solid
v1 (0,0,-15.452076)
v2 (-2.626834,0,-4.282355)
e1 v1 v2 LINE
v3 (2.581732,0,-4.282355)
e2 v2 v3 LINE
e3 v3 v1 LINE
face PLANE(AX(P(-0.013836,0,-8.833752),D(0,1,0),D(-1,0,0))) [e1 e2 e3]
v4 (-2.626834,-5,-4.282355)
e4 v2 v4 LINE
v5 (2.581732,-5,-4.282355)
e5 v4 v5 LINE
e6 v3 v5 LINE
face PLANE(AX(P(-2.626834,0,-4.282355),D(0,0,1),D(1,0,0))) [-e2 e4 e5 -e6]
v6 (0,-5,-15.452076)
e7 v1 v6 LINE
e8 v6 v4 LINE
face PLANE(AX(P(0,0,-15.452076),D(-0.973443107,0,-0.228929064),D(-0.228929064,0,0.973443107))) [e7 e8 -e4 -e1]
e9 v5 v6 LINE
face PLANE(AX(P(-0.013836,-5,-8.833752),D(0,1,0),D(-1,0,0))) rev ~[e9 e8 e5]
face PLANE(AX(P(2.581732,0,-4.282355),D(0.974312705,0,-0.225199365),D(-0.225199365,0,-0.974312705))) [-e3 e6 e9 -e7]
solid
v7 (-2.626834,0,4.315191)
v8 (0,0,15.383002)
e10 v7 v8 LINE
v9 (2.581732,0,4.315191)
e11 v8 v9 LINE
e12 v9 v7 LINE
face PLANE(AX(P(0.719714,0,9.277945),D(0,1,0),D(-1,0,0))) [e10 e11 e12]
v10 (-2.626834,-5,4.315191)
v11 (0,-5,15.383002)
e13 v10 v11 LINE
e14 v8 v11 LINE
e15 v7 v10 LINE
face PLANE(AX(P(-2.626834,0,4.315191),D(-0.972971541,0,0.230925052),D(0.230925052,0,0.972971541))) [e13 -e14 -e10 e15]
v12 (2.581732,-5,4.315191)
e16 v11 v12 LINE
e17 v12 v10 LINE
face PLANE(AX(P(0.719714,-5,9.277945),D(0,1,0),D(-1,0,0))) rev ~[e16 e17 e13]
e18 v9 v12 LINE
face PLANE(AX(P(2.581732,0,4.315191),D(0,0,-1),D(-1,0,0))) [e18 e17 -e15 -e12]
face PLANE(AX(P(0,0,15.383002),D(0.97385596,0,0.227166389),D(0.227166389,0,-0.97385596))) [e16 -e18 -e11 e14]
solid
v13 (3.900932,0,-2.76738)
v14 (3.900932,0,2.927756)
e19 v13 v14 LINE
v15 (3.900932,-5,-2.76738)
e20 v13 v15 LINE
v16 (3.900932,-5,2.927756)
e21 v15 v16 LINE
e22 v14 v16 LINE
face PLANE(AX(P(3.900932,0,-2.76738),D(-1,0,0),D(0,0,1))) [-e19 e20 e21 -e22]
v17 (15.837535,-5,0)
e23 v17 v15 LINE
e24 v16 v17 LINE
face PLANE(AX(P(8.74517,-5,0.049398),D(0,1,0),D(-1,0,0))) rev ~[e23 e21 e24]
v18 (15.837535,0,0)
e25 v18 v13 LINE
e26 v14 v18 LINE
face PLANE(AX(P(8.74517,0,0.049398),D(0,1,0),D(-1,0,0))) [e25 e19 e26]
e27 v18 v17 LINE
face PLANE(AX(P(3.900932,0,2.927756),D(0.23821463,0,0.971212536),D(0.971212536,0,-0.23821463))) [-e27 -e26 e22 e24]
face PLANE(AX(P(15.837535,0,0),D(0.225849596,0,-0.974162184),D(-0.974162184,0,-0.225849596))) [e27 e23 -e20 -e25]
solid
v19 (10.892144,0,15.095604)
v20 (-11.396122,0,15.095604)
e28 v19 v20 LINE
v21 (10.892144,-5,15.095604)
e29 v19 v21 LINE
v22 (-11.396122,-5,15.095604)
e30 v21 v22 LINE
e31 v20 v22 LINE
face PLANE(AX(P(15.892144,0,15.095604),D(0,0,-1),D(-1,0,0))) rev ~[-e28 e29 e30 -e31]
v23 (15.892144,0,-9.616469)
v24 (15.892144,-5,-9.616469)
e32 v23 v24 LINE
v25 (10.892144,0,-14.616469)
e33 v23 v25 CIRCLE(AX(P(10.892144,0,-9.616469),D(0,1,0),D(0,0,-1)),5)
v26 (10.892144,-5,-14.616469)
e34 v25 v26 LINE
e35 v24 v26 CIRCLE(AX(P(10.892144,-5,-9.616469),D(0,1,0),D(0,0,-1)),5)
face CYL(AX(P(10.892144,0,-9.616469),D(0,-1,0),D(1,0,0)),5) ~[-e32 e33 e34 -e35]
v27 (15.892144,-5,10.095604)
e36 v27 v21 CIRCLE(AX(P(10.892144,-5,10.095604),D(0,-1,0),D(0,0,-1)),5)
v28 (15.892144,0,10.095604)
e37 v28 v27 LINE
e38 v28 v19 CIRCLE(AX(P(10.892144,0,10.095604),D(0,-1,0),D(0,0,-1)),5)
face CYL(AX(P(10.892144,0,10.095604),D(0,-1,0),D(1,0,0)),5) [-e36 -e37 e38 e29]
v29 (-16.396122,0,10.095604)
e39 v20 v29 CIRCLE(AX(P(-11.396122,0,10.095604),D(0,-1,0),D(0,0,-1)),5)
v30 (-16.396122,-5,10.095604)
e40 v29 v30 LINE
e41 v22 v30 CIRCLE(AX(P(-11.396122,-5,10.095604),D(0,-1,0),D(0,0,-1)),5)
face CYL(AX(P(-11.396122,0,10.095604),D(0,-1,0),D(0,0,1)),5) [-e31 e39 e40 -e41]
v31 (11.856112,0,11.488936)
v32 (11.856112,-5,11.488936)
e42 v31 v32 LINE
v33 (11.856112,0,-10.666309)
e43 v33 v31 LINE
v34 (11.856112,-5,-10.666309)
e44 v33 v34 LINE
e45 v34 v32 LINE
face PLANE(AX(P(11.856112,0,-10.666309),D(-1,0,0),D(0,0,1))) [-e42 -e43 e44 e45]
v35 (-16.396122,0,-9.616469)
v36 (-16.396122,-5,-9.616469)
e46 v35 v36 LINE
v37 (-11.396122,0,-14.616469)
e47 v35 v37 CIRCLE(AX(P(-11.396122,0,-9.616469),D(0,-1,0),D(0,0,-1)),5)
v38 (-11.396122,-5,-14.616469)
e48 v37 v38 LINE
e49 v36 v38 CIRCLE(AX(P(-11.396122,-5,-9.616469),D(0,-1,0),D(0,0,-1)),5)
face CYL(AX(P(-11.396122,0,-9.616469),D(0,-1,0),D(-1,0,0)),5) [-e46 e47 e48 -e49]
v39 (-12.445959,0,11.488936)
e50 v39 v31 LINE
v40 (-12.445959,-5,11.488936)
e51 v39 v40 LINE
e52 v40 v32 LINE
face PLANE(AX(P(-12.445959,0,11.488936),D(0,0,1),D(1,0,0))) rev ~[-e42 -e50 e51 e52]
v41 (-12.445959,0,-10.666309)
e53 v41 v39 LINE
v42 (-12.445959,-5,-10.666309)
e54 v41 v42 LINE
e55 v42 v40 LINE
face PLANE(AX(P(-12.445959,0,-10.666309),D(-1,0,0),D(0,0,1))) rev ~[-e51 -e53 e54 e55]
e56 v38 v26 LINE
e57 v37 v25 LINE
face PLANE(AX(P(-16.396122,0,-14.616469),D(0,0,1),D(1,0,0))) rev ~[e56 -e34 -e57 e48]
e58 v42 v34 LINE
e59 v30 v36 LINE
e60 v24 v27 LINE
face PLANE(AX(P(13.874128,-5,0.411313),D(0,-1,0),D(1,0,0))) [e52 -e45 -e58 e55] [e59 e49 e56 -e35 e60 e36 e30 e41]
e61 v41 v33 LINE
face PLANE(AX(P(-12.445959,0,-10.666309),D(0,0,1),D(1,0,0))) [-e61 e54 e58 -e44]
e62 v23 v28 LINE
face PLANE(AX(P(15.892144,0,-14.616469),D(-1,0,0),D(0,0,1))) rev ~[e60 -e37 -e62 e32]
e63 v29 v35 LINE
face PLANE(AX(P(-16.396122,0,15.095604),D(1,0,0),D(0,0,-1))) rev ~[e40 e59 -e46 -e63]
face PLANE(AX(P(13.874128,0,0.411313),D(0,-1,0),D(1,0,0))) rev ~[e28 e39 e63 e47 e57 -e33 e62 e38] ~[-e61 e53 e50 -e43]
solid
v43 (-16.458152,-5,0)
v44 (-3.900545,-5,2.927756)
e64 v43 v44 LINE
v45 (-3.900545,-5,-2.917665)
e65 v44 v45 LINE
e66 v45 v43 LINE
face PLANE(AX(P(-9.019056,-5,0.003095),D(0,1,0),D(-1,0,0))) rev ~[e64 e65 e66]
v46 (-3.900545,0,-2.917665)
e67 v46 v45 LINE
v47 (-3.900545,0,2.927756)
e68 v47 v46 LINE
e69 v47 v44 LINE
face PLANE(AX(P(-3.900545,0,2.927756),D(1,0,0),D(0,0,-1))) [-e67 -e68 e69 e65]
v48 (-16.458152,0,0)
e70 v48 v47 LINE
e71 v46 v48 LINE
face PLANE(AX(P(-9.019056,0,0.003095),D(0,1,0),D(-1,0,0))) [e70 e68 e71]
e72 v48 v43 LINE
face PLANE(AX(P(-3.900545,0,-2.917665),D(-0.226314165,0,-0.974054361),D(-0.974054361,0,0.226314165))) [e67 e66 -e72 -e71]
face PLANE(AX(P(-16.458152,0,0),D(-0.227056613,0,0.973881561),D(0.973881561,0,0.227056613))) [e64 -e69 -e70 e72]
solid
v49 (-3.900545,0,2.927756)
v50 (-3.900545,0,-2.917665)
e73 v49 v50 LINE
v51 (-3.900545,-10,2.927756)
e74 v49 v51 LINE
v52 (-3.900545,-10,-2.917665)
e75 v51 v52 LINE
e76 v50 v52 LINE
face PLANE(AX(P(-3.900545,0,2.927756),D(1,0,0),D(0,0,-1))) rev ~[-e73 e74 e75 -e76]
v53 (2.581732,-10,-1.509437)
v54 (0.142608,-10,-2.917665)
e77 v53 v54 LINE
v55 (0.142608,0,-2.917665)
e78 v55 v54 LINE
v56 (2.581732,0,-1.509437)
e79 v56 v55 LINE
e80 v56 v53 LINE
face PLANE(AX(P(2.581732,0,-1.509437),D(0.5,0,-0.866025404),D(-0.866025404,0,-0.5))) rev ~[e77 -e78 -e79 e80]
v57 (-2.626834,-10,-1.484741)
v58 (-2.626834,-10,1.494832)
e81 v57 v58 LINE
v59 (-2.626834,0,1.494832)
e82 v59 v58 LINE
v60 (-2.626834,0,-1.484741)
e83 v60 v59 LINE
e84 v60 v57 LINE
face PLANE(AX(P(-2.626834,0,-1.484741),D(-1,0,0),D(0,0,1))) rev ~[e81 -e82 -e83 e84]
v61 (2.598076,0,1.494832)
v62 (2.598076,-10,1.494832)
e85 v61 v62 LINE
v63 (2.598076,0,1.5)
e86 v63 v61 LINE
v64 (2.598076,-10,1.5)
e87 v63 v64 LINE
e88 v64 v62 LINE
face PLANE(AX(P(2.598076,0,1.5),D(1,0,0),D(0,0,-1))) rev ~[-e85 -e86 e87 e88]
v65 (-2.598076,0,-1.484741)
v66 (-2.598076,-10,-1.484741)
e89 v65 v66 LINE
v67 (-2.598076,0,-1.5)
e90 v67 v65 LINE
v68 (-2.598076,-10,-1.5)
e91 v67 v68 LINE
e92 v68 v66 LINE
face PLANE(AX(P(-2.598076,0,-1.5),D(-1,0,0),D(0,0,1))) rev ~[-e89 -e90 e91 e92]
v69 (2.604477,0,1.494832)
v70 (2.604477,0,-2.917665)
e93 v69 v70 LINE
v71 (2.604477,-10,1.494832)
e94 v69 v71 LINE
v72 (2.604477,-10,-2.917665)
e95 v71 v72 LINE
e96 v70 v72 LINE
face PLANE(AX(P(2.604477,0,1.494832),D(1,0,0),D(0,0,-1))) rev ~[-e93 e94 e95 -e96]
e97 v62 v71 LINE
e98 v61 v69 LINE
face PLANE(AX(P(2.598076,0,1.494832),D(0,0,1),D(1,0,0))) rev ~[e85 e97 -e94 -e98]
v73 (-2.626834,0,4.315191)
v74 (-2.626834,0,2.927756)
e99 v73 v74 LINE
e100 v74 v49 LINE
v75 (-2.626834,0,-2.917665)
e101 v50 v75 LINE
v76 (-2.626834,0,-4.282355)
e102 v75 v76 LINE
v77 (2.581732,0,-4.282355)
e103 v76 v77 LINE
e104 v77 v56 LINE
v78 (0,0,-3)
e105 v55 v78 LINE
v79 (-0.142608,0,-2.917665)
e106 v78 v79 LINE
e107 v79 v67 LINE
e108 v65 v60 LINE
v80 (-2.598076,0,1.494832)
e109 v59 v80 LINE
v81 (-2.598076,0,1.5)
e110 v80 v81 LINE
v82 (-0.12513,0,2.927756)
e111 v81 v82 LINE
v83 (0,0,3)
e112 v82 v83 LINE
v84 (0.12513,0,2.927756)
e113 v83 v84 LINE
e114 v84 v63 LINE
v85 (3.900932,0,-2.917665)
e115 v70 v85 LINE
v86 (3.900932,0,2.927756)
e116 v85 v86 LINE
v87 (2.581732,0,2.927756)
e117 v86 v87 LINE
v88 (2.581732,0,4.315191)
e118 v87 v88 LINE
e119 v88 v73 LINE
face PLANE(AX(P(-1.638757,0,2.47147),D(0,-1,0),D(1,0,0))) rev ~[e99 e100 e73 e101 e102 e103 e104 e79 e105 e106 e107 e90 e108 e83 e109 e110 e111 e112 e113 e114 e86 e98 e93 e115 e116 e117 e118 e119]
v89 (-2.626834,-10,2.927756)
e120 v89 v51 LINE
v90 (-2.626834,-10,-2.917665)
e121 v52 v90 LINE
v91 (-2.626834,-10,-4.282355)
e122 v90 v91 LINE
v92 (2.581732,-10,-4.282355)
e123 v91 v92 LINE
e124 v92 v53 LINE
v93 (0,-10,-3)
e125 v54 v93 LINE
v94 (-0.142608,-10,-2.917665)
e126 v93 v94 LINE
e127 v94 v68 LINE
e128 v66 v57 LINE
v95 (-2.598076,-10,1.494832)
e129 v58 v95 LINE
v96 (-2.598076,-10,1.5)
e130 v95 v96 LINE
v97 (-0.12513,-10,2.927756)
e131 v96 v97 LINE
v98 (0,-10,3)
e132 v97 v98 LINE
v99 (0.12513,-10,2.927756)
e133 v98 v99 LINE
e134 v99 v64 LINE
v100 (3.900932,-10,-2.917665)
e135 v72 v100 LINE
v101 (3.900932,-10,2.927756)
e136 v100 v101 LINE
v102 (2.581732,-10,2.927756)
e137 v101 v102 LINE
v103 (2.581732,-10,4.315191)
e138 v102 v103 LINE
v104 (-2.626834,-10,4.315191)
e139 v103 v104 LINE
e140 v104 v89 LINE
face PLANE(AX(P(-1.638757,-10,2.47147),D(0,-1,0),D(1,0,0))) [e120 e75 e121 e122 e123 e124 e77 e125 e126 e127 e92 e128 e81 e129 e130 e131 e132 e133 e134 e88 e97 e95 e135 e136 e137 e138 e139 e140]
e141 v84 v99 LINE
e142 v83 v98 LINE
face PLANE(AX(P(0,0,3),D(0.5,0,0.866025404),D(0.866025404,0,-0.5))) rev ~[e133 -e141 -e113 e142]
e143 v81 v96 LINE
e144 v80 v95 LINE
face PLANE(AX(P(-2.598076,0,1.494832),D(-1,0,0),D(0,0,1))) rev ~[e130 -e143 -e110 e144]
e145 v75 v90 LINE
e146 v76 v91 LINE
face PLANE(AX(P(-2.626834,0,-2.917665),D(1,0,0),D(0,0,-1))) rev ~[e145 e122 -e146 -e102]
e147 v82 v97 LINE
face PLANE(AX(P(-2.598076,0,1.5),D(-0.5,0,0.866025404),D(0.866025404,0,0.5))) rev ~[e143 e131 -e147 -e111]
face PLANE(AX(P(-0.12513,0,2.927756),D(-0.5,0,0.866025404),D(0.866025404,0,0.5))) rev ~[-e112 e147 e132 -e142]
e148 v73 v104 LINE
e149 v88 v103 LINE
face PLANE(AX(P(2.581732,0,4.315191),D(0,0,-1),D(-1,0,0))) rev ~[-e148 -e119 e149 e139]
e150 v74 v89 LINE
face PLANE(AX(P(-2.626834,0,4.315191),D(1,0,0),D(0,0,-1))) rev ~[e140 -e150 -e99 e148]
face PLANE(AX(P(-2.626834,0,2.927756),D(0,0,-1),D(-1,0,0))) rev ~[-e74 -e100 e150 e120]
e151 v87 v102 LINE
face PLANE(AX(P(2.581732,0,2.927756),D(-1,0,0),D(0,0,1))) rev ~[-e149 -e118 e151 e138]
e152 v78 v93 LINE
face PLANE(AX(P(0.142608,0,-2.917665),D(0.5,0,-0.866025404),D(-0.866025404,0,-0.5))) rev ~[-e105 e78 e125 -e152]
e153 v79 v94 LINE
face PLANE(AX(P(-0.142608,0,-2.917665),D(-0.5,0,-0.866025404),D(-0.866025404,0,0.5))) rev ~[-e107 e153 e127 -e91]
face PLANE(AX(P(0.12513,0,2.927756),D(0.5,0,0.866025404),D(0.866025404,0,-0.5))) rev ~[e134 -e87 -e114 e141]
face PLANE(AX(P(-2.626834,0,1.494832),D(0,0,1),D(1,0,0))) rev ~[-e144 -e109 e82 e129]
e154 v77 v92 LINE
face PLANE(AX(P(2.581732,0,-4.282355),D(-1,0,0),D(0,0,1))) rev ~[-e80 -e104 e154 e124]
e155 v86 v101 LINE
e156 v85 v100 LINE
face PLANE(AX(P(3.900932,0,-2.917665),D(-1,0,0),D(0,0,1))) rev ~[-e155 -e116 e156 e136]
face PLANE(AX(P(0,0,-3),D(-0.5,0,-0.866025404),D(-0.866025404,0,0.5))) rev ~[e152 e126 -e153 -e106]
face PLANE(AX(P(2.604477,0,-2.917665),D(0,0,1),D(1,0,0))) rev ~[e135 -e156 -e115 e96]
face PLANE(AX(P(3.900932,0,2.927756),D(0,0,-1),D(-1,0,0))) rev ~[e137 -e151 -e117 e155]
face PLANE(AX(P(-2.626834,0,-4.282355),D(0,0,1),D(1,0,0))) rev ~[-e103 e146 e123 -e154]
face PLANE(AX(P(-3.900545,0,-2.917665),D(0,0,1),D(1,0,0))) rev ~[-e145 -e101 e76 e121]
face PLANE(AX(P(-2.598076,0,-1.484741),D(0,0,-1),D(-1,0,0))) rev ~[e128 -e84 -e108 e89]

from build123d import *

# Parameters (mm, degrees)
F2_DEPTH = 10
F4_DEPTH = 5
F5_W     = 4.0360325947
F5_H     = 22.1552448347
F5_W_2   = 24.3020709604
F5_H_2   = 3.6066677421
F5_W_3   = 3.9501627907
F5_H_3   = 3.9501599967
F6_DEPTH = 5
F7_R     = 5


with BuildPart() as f2:
    # F1 (on face) → F2 (new body)
    with BuildSketch(Plane.XZ):
        Polygon((-2.6268342044, 2.9277561698), (-2.6268342044, 1.4948317548), (-2.5980762114, 1.4948317548), (-2.5980762114, 1.5), (-0.1251299844, 2.9277561698), align=None)
        Polygon((-2.6268342044, -1.4847409911), (-2.6268342044, 1.4948317548), (-2.6268342044, 2.9277561698), (-3.9005447179, 2.9277561698), (-3.9005447179, -2.9176650569), (-2.6268342044, -2.9176650569), align=None)
        Polygon((-2.6268342044, 4.3151909485), (-2.6268342044, 2.9277561698), (-0.1251299844, 2.9277561698), (0, 3), (0.1251299844, 2.9277561698), (2.5817316491, 2.9277561698), (2.5817316491, 4.3151909485), align=None)
        Polygon((-2.5980762114, -1.4847409911), (-2.6268342044, -1.4847409911), (-2.6268342044, -2.9176650569), (-0.1426083047, -2.9176650569), (-2.5980762114, -1.5), align=None)
        Polygon((2.5980762114, 1.5), (2.5980762114, 1.4948317548), (2.6044766419, 1.4948317548), (2.6044766419, 2.9277561698), (2.5817316491, 2.9277561698), (0.1251299844, 2.9277561698), align=None)
        Polygon((-0.1426083047, -2.9176650569), (-2.6268342044, -2.9176650569), (-2.6268342044, -4.2823553085), (2.5817316491, -4.2823553085), (2.5817316491, -2.9176650569), (0.1426083047, -2.9176650569), (0, -3), align=None)
        Polygon((2.6044766419, 2.9277561698), (2.6044766419, 1.4948317548), (2.6044766419, -2.9176650569), (3.9009321481, -2.9176650569), (3.9009321481, 2.9277561698), align=None)
        Polygon((2.5817316491, -2.9176650569), (2.5817316491, -1.5094365374), (0.1426083047, -2.9176650569), align=None)
    extrude(amount=F2_DEPTH)


with BuildPart() as f4:
    # F3 (on face) → F4 (new body)
    with BuildSketch(Plane(origin=(0, 0, 0), x_dir=(-1, 0, 0), z_dir=(0, 1, 0))):
        Polygon((-3.9009321481, -2.7673800444), (-3.9009321481, 2.9277561698), (-15.8375352621, 0), align=None)
    extrude(amount=-F4_DEPTH)


with BuildPart() as f4b:
    # F3 (on face) → F4, piece 2 (new body)
    with BuildSketch(Plane(origin=(0, 0, 0), x_dir=(-1, 0, 0), z_dir=(0, 1, 0))):
        Polygon((-2.5817316491, 4.3151909485), (0, 4.3151909485), (0, 15.3830023482), align=None)
        Polygon((0, 15.3830023482), (0, 4.3151909485), (2.6268342044, 4.3151909485), align=None)
    extrude(amount=-F4_DEPTH)


with BuildPart() as f4c:
    # F3 (on face) → F4, piece 3 (new body)
    with BuildSketch(Plane(origin=(0, 0, 0), x_dir=(-1, 0, 0), z_dir=(0, 1, 0))):
        Polygon((16.458151862, 0), (3.9005447179, 2.9277561698), (3.9005447179, -2.9176650569), align=None)
    extrude(amount=-F4_DEPTH)


with BuildPart() as f4d:
    # F3 (on face) → F4, piece 4 (new body)
    with BuildSketch(Plane(origin=(0, 0, 0), x_dir=(-1, 0, 0), z_dir=(0, 1, 0))):
        Polygon((0, -15.4520757496), (2.6268342044, -4.2823553085), (-2.5817316491, -4.2823553085), align=None)
    extrude(amount=-F4_DEPTH)


with BuildPart() as f6:
    # F5 (on Front) → F6 (new body)
    with BuildSketch(Plane.XZ):
        with Locations((13.8741279952, 0.4113134928)):
            Rectangle(F5_W, F5_H)
        with Locations((-0.2949237823, 13.2922697812)):
            Rectangle(F5_W_2, F5_H_2)
        Polygon((-16.3961220533, -10.6663089246), (-12.4459592625, -10.6663089246), (-12.4459592625, 11.4889359102), (-12.4459592625, 15.0956036523), (-16.3961220533, 15.0956036523), align=None)
        with Locations((-14.4210406579, -12.6413889229)):
            Rectangle(F5_W_3, F5_H_3)
        with Locations((-0.2949237823, -12.6413889229)):
            Rectangle(F5_W_2, F5_H_3)
        with Locations((13.8741279952, -12.6413889229)):
            Rectangle(F5_W, F5_H_3)
        with Locations((13.8741279952, 13.2922697812)):
            Rectangle(F5_W, F5_H_2)
    extrude(amount=F6_DEPTH)

    # F7
    f7_edges = [f6.edges().sort_by_distance(p)[0] for p in [
        (15.892144, -2.5, -14.616469),
        (-16.396122, -2.5, -14.616469),
        (15.892144, -2.5, 15.095604),
        (-16.396122, -2.5, 15.095604),
    ]]
    fillet(f7_edges, radius=F7_R)


solid = Compound([f2.part, f4.part, f4b.part, f4c.part, f4d.part, f6.part])
